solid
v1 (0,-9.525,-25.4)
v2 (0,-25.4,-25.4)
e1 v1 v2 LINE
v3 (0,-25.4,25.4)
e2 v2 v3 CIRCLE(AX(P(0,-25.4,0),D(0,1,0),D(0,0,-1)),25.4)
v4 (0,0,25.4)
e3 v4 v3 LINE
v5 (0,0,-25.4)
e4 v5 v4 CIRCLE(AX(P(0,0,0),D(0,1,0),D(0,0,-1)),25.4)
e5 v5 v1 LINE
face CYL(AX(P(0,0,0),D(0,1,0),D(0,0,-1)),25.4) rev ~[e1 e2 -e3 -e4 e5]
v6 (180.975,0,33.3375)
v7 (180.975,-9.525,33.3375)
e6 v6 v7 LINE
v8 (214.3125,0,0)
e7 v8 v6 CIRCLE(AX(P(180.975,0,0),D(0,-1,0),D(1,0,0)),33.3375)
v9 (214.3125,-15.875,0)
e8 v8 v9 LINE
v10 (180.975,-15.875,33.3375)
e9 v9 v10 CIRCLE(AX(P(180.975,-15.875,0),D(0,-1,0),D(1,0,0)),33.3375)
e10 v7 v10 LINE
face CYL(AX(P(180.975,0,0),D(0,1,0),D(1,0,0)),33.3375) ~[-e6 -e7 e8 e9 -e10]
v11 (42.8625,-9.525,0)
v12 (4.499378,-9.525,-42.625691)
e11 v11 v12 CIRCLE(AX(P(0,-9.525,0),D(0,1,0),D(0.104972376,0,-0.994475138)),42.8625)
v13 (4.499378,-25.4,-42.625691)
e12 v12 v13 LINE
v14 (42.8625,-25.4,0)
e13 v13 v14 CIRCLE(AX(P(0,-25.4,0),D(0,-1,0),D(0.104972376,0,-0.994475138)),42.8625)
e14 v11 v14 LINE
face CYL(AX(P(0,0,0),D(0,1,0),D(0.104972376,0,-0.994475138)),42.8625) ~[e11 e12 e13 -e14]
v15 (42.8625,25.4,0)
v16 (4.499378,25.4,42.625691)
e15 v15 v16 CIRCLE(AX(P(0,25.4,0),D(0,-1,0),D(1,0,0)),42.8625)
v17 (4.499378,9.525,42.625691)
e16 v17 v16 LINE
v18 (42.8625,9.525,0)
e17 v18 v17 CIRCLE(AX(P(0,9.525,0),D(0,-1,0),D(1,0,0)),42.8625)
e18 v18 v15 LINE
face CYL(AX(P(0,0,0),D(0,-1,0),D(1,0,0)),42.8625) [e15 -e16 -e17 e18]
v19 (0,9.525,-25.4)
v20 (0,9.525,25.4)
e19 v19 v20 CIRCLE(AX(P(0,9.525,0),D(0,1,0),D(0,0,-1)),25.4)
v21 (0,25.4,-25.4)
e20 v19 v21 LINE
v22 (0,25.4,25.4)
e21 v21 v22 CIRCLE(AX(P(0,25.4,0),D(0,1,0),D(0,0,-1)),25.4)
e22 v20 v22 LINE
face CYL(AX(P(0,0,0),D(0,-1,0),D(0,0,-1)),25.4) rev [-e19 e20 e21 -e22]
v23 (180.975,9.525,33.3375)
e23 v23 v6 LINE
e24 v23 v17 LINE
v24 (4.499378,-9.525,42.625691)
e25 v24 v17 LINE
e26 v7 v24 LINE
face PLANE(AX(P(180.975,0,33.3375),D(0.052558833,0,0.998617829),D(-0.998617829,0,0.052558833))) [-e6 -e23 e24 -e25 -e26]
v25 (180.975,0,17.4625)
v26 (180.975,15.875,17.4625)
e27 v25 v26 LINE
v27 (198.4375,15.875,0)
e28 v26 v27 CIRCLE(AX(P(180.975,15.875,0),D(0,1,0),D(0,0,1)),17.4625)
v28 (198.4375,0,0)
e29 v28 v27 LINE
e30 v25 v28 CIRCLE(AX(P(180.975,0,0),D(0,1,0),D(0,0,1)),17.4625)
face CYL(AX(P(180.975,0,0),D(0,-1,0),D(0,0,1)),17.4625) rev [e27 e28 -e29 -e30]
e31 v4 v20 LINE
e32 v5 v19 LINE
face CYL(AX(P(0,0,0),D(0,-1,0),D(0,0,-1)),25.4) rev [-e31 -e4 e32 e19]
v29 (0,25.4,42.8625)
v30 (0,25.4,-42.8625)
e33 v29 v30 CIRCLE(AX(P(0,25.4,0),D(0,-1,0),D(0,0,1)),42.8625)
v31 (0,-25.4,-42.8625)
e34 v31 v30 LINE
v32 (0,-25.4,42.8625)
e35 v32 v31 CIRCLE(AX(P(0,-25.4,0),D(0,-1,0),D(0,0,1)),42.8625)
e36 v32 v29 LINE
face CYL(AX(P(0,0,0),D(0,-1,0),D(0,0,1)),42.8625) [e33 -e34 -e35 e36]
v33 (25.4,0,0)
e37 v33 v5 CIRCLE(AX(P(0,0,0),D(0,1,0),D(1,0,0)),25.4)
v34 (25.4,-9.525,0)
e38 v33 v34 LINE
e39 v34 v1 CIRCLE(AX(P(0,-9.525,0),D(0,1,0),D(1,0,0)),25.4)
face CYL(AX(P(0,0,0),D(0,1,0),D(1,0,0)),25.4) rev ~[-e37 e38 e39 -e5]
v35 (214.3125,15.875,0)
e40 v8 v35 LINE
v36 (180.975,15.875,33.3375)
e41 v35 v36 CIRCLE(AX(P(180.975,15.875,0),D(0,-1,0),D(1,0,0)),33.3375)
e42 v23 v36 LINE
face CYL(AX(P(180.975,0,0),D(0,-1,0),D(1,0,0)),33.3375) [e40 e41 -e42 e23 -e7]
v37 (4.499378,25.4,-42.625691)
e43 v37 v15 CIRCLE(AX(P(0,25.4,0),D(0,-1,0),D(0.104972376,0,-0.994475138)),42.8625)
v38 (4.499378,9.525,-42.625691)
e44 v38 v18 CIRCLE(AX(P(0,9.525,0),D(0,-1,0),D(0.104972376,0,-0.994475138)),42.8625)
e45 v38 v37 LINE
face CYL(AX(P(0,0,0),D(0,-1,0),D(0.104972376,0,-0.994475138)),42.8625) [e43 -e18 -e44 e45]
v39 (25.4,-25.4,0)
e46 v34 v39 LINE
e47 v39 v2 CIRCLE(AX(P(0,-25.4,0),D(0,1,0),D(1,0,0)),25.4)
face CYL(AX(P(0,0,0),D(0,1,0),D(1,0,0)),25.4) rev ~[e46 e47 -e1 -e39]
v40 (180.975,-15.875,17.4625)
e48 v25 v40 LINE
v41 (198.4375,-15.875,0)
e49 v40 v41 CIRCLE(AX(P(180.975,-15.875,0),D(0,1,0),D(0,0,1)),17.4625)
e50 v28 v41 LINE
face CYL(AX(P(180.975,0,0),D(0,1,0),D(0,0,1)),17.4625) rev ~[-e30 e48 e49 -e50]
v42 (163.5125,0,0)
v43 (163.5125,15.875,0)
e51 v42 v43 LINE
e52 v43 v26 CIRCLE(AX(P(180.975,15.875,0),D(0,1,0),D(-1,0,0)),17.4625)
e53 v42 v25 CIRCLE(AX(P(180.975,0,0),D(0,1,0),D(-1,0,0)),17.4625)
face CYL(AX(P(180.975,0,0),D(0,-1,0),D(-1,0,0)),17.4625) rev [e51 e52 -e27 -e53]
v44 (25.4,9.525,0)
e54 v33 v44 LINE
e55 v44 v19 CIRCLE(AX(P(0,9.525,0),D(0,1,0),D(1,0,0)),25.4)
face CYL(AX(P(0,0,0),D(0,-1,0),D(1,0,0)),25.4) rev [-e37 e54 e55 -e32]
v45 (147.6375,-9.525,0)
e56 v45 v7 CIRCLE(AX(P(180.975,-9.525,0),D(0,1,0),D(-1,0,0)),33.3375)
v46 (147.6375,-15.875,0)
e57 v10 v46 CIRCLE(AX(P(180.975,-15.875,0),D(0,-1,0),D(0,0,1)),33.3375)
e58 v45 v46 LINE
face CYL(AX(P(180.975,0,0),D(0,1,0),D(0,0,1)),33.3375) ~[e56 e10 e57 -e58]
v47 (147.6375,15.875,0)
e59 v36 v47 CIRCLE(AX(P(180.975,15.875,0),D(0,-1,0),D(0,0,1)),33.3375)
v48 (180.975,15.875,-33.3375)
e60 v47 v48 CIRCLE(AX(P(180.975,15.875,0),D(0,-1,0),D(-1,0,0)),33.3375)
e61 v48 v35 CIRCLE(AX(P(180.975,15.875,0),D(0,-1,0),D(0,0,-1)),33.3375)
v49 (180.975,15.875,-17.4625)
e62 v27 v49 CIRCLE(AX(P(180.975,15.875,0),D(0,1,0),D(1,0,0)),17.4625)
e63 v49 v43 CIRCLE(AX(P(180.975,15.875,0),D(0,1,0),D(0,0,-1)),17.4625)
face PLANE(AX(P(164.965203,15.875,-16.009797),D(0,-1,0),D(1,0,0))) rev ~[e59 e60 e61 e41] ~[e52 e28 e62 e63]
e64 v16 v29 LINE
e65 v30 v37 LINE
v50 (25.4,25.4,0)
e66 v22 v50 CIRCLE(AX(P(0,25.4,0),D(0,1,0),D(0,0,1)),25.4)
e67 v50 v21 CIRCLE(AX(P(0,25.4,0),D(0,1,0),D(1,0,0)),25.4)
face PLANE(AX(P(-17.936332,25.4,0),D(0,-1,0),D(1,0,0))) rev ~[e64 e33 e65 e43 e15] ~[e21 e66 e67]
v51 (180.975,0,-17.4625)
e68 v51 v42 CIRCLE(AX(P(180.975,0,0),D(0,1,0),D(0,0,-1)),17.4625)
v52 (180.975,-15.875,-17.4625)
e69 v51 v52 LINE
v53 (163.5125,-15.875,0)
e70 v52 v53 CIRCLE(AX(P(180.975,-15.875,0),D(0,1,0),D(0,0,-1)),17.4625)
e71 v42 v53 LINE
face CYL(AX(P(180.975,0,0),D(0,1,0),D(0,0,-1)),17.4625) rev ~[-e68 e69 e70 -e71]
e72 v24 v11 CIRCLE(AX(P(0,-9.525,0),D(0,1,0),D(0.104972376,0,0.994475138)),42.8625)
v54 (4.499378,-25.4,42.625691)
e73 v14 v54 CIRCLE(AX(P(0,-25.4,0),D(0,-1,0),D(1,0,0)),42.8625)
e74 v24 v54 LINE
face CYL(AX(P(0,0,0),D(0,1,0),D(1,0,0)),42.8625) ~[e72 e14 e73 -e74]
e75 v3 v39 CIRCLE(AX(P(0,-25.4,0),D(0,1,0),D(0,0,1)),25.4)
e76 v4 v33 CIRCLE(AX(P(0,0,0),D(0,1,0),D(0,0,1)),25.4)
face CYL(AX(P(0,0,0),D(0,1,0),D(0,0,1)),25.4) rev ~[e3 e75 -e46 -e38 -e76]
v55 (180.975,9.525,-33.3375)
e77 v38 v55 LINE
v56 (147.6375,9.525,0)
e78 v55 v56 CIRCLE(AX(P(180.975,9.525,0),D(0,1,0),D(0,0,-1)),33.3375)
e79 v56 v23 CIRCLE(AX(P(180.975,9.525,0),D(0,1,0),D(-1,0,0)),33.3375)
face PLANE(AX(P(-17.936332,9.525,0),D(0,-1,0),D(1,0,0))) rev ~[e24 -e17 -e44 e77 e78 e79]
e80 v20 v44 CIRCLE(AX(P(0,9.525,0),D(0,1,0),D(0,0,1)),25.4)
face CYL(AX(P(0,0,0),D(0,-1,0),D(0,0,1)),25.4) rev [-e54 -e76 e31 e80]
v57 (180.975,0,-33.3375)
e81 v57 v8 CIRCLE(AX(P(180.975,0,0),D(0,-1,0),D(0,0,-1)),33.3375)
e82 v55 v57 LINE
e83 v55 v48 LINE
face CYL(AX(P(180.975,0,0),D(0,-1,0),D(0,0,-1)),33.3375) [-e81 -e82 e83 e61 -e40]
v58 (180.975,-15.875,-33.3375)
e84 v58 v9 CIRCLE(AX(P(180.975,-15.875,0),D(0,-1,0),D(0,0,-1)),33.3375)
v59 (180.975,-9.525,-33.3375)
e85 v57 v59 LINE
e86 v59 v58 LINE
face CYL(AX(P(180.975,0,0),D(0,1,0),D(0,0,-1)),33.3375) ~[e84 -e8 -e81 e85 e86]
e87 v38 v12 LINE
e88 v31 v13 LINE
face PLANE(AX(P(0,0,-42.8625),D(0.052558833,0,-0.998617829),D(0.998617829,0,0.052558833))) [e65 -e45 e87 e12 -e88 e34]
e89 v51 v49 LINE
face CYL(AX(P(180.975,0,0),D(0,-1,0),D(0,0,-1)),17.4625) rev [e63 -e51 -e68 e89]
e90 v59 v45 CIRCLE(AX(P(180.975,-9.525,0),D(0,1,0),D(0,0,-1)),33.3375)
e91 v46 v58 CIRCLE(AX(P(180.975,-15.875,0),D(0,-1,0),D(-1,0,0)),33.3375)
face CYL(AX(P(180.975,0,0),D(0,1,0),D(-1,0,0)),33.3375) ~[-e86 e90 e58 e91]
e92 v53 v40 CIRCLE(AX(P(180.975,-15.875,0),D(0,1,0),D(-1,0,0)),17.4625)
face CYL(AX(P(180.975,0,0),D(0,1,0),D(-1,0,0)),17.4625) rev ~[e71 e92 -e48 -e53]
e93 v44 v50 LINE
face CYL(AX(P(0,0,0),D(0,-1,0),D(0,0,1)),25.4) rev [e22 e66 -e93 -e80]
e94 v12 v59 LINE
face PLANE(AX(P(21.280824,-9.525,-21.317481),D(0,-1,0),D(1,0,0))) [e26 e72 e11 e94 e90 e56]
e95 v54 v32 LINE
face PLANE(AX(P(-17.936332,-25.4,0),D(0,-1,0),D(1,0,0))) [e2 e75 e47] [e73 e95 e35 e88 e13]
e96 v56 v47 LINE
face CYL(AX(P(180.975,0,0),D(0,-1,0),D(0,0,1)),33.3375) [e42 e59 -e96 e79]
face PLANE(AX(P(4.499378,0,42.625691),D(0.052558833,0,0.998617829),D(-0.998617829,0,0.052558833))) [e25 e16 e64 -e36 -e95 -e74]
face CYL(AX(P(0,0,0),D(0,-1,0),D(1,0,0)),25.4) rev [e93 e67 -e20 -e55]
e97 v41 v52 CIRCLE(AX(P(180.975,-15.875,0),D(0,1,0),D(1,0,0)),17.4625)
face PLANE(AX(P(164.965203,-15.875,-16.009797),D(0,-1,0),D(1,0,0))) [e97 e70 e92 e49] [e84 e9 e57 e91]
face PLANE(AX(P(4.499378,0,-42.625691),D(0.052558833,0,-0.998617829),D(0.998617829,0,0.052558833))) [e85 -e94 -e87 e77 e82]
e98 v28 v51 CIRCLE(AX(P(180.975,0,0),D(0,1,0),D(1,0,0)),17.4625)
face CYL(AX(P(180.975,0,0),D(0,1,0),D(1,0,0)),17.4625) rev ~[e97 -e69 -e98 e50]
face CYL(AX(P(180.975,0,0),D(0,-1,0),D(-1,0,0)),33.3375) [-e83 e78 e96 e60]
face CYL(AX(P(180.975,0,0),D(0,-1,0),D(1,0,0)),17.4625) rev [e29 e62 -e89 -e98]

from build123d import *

# Parameters (mm, degrees)
F1_DEPTH = 25.4
F2_DEPTH = 25.4
F3_DEPTH = 9.525
F4_DEPTH = 9.525
F5_DEPTH = 15.875
F6_DEPTH = 15.875


with BuildPart() as f1:
    # F0 (on Front) → F1 (new body)
    with BuildSketch(Plane.XZ):
        with BuildLine():
            Line((0, 25.4), (0, 42.8625))
            ThreePointArc((0, 42.8625), (-42.8625, 0), (0, -42.8625))
            Line((0, -42.8625), (0, -25.4))
            ThreePointArc((0, -25.4), (-25.4, 0), (0, 25.4))
        make_face()
        with BuildLine():
            Line((4.499378453, 42.6256906077), (0, 42.8625))
            Line((0, 42.8625), (0, 25.4))
            ThreePointArc((0, 25.4), (17.9605122421, 17.9605122421), (25.4, 0))
            Line((25.4, 0), (42.8625, 0))
            ThreePointArc((42.8625, 0), (31.8594453435, 28.6735008092), (4.499378453, 42.6256906077))
        make_face()
        with BuildLine():
            Line((0, -25.4), (0, -42.8625))
            Line((0, -42.8625), (4.499378453, -42.6256906077))
            ThreePointArc((4.499378453, -42.6256906077), (31.8594453435, -28.6735008092), (42.8625, 0))
            Line((42.8625, 0), (25.4, 0))
            ThreePointArc((25.4, 0), (17.9605122421, -17.9605122421), (0, -25.4))
        make_face()
    extrude(amount=F1_DEPTH)

    # F2 (add): a face of the model
    f2_faces = [f1.faces().sort_by_distance(p)[0] for p in [
        (-41.6501654237, 0, 0),
    ]]
    extrude(f2_faces, amount=F2_DEPTH)

    # F0 (on Front) → F3 (join)
    with BuildSketch(Plane.XZ):
        with BuildLine():
            Line((0, -25.4), (0, -42.8625))
            Line((0, -42.8625), (4.499378453, -42.6256906077))
            ThreePointArc((4.499378453, -42.6256906077), (31.8594453435, -28.6735008092), (42.8625, 0))
            Line((42.8625, 0), (25.4, 0))
            ThreePointArc((25.4, 0), (17.9605122421, -17.9605122421), (0, -25.4))
        make_face()
        with BuildLine():
            Line((180.975, 33.3375), (4.499378453, 42.6256906077))
            ThreePointArc((4.499378453, 42.6256906077), (31.8594453435, 28.6735008092), (42.8625, 0))
            Line((42.8625, 0), (147.6375, 0))
            ThreePointArc((147.6375, 0), (157.4018276822, 23.5731723178), (180.975, 33.3375))
        make_face()
        with BuildLine():
            ThreePointArc((42.8625, 0), (31.8594453435, -28.6735008092), (4.499378453, -42.6256906077))
            Line((4.499378453, -42.6256906077), (180.975, -33.3375))
            ThreePointArc((180.975, -33.3375), (157.4018276822, -23.5731723178), (147.6375, 0))
            Line((147.6375, 0), (42.8625, 0))
        make_face()
    extrude(amount=F3_DEPTH)

    # F0 (on Front) → F4 (join)
    with BuildSketch(Plane.XZ):
        with BuildLine():
            Line((0, 25.4), (0, 42.8625))
            ThreePointArc((0, 42.8625), (-42.8625, 0), (0, -42.8625))
            Line((0, -42.8625), (0, -25.4))
            ThreePointArc((0, -25.4), (-25.4, 0), (0, 25.4))
        make_face()
        with BuildLine():
            Line((4.499378453, 42.6256906077), (0, 42.8625))
            Line((0, 42.8625), (0, 25.4))
            ThreePointArc((0, 25.4), (17.9605122421, 17.9605122421), (25.4, 0))
            Line((25.4, 0), (42.8625, 0))
            ThreePointArc((42.8625, 0), (31.8594453435, 28.6735008092), (4.499378453, 42.6256906077))
        make_face()
        with BuildLine():
            Line((0, -25.4), (0, -42.8625))
            Line((0, -42.8625), (4.499378453, -42.6256906077))
            ThreePointArc((4.499378453, -42.6256906077), (31.8594453435, -28.6735008092), (42.8625, 0))
            Line((42.8625, 0), (25.4, 0))
            ThreePointArc((25.4, 0), (17.9605122421, -17.9605122421), (0, -25.4))
        make_face()
        with BuildLine():
            Line((180.975, 33.3375), (4.499378453, 42.6256906077))
            ThreePointArc((4.499378453, 42.6256906077), (31.8594453435, 28.6735008092), (42.8625, 0))
            Line((42.8625, 0), (147.6375, 0))
            ThreePointArc((147.6375, 0), (157.4018276822, 23.5731723178), (180.975, 33.3375))
        make_face()
        with BuildLine():
            ThreePointArc((42.8625, 0), (31.8594453435, -28.6735008092), (4.499378453, -42.6256906077))
            Line((4.499378453, -42.6256906077), (180.975, -33.3375))
            ThreePointArc((180.975, -33.3375), (157.4018276822, -23.5731723178), (147.6375, 0))
            Line((147.6375, 0), (42.8625, 0))
        make_face()
    extrude(amount=-F4_DEPTH)

    # F0 (on Front) → F5 (join)
    with BuildSketch(Plane.XZ):
        with BuildLine():
            ThreePointArc((147.6375, 0), (157.4018276822, -23.5731723178), (180.975, -33.3375))
            Line((180.975, -33.3375), (180.975, -17.4625))
            ThreePointArc((180.975, -17.4625), (168.6271478335, -12.3478521665), (163.5125, 0))
            Line((163.5125, 0), (147.6375, 0))
        make_face()
        with BuildLine():
            Line((180.975, 17.4625), (180.975, 33.3375))
            ThreePointArc((180.975, 33.3375), (157.4018276822, 23.5731723178), (147.6375, 0))
            Line((147.6375, 0), (163.5125, 0))
            ThreePointArc((163.5125, 0), (168.6271478335, 12.3478521665), (180.975, 17.4625))
        make_face()
        with BuildLine():
            ThreePointArc((214.3125, 0), (204.5481723178, 23.5731723178), (180.975, 33.3375))
            Line((180.975, 33.3375), (180.975, 17.4625))
            ThreePointArc((180.975, 17.4625), (193.3228521665, 12.3478521665), (198.4375, 0))
            ThreePointArc((198.4375, 0), (193.3228521665, -12.3478521665), (180.975, -17.4625))
            Line((180.975, -17.4625), (180.975, -33.3375))
            ThreePointArc((180.975, -33.3375), (204.5481723178, -23.5731723178), (214.3125, 0))
        make_face()
    extrude(amount=F5_DEPTH)

    # F0 (on Front) → F6 (join)
    with BuildSketch(Plane.XZ):
        with BuildLine():
            ThreePointArc((147.6375, 0), (157.4018276822, -23.5731723178), (180.975, -33.3375))
            Line((180.975, -33.3375), (180.975, -17.4625))
            ThreePointArc((180.975, -17.4625), (168.6271478335, -12.3478521665), (163.5125, 0))
            Line((163.5125, 0), (147.6375, 0))
        make_face()
        with BuildLine():
            Line((180.975, 17.4625), (180.975, 33.3375))
            ThreePointArc((180.975, 33.3375), (157.4018276822, 23.5731723178), (147.6375, 0))
            Line((147.6375, 0), (163.5125, 0))
            ThreePointArc((163.5125, 0), (168.6271478335, 12.3478521665), (180.975, 17.4625))
        make_face()
        with BuildLine():
            ThreePointArc((214.3125, 0), (204.5481723178, 23.5731723178), (180.975, 33.3375))
            Line((180.975, 33.3375), (180.975, 17.4625))
            ThreePointArc((180.975, 17.4625), (193.3228521665, 12.3478521665), (198.4375, 0))
            ThreePointArc((198.4375, 0), (193.3228521665, -12.3478521665), (180.975, -17.4625))
            Line((180.975, -17.4625), (180.975, -33.3375))
            ThreePointArc((180.975, -33.3375), (204.5481723178, -23.5731723178), (214.3125, 0))
        make_face()
    extrude(amount=-F6_DEPTH)


solid = f1.part
